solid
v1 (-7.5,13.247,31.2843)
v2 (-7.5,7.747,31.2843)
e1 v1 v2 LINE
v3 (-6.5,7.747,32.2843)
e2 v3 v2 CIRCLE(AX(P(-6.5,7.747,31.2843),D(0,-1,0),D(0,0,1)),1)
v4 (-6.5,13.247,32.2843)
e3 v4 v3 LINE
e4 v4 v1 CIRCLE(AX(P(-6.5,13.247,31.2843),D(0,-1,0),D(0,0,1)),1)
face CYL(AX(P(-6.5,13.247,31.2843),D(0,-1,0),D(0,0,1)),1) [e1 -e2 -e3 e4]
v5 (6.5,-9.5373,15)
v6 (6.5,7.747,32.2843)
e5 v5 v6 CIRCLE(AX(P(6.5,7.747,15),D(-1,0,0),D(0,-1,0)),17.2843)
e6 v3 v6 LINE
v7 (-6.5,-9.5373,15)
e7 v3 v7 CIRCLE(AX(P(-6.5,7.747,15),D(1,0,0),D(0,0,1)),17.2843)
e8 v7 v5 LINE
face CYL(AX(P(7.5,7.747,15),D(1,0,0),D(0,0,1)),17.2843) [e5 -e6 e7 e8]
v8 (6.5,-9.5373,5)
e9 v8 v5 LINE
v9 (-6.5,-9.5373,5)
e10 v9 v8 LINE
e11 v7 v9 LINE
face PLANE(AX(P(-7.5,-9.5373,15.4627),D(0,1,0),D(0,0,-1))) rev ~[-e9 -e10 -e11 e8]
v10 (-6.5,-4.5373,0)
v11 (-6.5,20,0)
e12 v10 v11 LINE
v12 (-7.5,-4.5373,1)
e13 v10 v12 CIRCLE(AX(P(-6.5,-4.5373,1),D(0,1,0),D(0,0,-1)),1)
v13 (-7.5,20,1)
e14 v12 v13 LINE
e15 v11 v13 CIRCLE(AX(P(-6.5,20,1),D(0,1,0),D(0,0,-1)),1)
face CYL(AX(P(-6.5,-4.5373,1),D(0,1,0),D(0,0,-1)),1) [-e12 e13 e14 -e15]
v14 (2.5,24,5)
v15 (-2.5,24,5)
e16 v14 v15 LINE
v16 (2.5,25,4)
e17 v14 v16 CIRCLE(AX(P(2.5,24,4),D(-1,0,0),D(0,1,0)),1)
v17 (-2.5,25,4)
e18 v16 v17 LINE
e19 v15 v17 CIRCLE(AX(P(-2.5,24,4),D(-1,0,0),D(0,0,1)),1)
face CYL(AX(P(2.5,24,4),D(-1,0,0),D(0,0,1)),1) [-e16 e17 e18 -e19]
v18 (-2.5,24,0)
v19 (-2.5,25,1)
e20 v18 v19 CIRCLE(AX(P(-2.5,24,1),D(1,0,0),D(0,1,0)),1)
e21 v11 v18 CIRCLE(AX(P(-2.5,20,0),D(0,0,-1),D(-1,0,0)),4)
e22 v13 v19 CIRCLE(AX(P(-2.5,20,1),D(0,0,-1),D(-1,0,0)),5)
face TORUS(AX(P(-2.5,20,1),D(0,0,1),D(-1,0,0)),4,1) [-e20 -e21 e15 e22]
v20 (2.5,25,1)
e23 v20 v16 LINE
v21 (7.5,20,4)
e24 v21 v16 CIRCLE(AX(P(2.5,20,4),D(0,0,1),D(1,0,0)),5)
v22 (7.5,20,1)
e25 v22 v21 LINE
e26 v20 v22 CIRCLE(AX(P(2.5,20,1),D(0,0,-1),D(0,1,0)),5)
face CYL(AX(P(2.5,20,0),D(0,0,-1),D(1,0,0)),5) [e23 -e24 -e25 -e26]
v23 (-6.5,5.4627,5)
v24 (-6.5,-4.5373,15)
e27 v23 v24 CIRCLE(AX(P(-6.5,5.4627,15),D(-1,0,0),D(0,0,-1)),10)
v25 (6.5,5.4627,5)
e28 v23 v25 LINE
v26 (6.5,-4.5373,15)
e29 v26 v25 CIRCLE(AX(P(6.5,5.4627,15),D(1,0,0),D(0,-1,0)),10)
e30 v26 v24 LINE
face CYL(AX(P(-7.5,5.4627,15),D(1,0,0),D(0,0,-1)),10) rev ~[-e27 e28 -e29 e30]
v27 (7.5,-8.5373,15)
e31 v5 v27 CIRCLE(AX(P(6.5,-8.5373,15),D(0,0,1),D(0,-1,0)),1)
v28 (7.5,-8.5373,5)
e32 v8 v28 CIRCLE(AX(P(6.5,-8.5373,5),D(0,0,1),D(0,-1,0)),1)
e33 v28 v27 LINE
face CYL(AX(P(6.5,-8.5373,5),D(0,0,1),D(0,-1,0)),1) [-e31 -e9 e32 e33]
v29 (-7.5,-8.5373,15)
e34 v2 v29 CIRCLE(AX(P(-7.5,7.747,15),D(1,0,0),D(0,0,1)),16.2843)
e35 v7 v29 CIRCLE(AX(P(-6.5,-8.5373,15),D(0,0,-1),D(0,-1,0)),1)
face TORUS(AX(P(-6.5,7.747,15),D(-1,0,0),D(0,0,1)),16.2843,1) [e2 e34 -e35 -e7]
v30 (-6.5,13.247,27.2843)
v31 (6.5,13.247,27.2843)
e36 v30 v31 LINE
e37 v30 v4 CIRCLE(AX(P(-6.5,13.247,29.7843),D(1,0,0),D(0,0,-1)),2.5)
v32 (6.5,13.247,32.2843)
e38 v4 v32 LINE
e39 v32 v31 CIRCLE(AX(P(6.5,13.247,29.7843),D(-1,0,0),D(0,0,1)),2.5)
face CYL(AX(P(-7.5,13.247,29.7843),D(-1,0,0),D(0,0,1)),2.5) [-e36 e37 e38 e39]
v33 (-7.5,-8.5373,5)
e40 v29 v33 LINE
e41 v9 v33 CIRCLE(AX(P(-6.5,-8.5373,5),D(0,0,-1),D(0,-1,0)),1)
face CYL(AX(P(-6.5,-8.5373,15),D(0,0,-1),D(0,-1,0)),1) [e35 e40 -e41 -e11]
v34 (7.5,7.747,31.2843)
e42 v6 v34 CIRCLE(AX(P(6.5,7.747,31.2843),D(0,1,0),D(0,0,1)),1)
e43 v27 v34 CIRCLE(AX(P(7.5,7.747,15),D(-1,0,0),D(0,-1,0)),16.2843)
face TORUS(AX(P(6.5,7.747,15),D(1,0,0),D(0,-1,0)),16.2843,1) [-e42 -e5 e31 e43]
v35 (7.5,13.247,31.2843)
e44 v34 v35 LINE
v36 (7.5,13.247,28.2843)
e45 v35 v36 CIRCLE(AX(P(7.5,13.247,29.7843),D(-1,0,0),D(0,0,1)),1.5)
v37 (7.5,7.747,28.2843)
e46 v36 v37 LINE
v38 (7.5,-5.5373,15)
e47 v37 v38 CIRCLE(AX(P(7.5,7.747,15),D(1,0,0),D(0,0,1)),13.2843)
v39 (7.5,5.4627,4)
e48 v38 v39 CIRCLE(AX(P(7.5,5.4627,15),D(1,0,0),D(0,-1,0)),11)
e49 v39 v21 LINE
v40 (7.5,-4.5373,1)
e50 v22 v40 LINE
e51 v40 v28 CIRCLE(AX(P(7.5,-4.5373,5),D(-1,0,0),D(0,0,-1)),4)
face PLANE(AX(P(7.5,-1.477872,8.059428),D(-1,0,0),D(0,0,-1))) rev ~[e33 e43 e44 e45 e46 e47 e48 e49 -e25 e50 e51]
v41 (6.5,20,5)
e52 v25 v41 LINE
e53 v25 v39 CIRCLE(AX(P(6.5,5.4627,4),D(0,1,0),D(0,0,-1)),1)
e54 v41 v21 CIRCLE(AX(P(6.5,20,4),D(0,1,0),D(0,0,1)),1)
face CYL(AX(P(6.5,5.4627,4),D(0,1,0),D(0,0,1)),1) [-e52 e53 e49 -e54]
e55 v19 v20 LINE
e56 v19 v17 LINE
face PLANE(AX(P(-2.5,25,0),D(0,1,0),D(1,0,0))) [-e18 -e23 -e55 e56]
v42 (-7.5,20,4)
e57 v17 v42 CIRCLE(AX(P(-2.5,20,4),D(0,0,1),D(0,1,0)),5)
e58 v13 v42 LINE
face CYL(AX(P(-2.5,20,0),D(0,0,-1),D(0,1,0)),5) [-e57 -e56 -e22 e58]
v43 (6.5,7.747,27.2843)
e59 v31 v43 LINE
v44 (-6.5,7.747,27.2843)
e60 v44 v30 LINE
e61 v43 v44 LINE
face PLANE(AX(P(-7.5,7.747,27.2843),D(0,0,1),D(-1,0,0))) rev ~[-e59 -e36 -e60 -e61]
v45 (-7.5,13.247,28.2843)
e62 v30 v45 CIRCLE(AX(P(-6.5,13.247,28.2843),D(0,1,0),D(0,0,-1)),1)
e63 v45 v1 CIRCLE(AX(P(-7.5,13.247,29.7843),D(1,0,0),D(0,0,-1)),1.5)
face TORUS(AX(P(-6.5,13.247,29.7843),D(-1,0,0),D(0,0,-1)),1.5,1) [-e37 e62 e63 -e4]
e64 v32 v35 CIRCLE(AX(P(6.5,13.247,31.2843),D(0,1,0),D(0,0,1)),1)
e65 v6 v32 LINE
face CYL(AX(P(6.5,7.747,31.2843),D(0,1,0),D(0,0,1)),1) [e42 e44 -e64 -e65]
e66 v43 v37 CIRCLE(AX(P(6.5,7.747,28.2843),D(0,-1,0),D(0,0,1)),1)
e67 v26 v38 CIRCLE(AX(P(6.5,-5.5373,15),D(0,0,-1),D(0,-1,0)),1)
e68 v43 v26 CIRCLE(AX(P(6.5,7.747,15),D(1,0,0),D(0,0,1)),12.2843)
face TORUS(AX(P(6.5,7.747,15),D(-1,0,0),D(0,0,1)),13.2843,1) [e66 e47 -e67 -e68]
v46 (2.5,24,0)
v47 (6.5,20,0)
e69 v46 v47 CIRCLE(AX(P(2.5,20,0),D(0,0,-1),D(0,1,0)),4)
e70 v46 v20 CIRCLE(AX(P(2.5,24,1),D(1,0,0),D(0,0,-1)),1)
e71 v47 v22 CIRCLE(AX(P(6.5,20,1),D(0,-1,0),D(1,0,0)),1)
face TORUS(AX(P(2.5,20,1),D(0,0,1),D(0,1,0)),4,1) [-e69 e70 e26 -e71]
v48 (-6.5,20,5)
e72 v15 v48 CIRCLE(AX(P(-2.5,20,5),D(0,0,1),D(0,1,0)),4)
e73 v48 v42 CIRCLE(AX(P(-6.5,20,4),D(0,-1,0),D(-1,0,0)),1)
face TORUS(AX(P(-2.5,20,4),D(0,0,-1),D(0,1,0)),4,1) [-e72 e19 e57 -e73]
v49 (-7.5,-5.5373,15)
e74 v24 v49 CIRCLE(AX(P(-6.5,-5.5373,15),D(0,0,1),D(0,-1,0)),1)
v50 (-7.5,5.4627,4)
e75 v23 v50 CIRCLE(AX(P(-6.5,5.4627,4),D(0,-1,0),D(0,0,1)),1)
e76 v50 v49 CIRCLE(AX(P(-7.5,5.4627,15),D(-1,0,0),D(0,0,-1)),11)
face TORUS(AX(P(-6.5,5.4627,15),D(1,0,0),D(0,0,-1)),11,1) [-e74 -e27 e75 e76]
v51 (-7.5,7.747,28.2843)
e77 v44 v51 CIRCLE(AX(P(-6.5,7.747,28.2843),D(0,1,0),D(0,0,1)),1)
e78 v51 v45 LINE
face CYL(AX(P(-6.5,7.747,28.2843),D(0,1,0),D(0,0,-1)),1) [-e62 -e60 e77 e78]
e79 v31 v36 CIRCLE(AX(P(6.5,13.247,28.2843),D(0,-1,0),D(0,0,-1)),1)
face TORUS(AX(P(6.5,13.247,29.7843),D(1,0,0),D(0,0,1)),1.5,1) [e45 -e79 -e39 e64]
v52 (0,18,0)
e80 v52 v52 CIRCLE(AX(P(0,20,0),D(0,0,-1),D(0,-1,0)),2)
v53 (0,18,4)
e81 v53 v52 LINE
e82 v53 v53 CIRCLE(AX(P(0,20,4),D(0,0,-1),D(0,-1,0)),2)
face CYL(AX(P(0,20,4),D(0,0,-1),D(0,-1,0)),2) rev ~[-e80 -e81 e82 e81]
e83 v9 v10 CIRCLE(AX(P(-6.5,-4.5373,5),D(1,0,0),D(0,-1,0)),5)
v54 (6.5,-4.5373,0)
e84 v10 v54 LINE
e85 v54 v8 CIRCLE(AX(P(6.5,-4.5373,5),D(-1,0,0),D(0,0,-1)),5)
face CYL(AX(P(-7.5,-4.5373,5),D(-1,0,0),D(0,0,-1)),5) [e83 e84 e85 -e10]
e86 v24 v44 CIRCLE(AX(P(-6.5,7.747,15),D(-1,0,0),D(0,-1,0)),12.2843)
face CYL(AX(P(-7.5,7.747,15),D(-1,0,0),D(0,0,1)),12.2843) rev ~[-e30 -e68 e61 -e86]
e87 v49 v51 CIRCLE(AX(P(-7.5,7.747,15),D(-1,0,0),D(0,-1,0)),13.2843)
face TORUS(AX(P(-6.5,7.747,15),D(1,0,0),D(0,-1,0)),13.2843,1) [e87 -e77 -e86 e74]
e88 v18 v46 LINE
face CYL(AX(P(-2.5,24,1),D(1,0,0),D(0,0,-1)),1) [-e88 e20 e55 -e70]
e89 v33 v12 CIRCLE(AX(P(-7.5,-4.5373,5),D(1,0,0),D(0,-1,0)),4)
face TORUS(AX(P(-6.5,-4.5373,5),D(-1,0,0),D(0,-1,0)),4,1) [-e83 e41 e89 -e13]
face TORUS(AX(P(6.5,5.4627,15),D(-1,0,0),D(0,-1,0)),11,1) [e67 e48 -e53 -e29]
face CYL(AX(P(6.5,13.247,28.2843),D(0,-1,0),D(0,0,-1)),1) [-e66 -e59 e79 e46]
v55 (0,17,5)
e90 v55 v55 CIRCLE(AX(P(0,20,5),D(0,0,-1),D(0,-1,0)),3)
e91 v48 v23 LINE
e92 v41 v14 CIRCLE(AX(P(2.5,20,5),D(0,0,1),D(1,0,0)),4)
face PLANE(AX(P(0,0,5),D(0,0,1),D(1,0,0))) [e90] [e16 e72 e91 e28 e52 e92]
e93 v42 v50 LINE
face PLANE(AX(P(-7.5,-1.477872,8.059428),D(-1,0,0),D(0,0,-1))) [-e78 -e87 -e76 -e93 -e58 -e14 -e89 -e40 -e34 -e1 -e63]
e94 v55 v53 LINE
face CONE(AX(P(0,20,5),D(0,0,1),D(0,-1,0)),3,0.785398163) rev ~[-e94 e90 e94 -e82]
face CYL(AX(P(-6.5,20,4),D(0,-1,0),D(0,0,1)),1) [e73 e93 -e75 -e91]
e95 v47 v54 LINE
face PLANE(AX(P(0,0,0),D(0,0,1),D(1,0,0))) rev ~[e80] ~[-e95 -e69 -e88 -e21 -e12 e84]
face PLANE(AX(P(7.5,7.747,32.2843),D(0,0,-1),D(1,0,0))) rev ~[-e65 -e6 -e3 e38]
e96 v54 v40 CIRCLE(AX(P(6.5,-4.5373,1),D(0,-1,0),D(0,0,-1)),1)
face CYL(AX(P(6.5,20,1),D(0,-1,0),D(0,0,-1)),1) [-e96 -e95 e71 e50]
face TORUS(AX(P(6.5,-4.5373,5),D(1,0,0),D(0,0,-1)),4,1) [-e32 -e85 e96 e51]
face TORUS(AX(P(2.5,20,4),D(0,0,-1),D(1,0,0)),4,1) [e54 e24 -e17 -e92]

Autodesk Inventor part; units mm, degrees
ref_plane "YZ Plane" through (0, 0, 0) normal (1, 0, 0) x (0, 1, 0)
ref_plane "XZ Plane" through (0, 0, 0) normal (0, 1, 0) x (-1, 0, 0)
ref_plane "XY Plane" through (0, 0, 0) normal (0, 0, 1) x (1, 0, 0)
sketch "Sketch1" plane through (0, 0, 0) normal (0, 0, 1) x (1, 0, 0)
  line L0 (-2.5, 25) -> (2.5, 25)
  line L1 (7.5, 20) -> (7.5, -20)
  line L2 (2.5, -25) -> (-2.5, -25)
  line L3 (-7.5, -20) -> (-7.5, 20)
  line L4 (-7.5, 25) -> (7.5, -25) construction
  line L5 (7.5, 25) -> (-7.5, -25) construction
  arc A0 (-2.5, 25) -> (-7.5, 20) centre (-2.5, 20) ccw
  arc A1 (7.5, 20) -> (2.5, 25) centre (2.5, 20) ccw
  arc A2 (2.5, -25) -> (7.5, -20) centre (2.5, -20) ccw
  arc A3 (-7.5, -20) -> (-2.5, -25) centre (-2.5, -20) ccw
  circle A4 centre (0, 20) radius 1
  point P0 (0, 0)
  dimension "d0" = 15
  dimension "d1" = 50
  dimension "d2" = 5
  dimension "d5" = 2
extrude "Extrusion2" add sketch "Sketch1" along normal blind 5
sketch "Sketch3" plane through (0, 0, 5) normal (0, 0, 1) x (1, 0, 0)
  circle A0 centre (0, 20) radius 1 projected
  point P0 (0, 0)
hole "Hole1" at (0, 20, 5) direction (0, 0, -1) diameter 4 end through all countersink diameter 6 countersink angle 90
sketch "Sketch4" plane through (0, 0, 0) normal (1, 0, 0) x (0, 1, 0)
  line L0 (28.9186, 2.2501) -> (-11.8341, 2.2501) construction
  line L1 (20, 0) -> (-20, 0) projected
  line L2 (-20, 5) -> (20, 5) construction
  line L3 (-2.191, 5) -> (-11.8341, 5) construction
  line L4 (-7.253, 15) -> (-7.253, 5)
  arc A0 (7.747, 30) -> (-7.253, 15) centre (7.747, 15) ccw
  line L5 (7.747, 30) -> (15.747, 30)
  point P0 (0, 0)
  point P1 (8.5422, 2.2501)
  dimension "d24" = 10
  dimension "d25" = 8
sketch "Sketch5" plane through (0, 0, 5) normal (0, 0, 1) x (1, 0, 0)
  line L0 (7.5, 20) -> (7.5, -20) projected
  line L1 (-7.5, -4.5373) -> (7.5, -4.5373)
  line L2 (7.5, -4.5373) -> (7.5, -9.5373)
  line L3 (7.5, -9.5373) -> (-7.5, -9.5373)
  line L4 (-7.5, -9.5373) -> (-7.5, -4.5373)
  line L5 (-7.5, -4.5373) -> (7.5, -9.5373) construction
  line L6 (7.5, -4.5373) -> (-7.5, -9.5373) construction
  point P0 (0, 0)
  point P1 (0, -7.0373)
  dimension "d17" = 15
  dimension "d18" = 5
sweep "Sweep3" add profiles "Sketch5" path "Sketch4" path curves L4 A0 L5
sketch "Sketch8" plane through (0, 0, 5) normal (0, 0, 1) x (1, 0, 0)
  line L0 (7.5, -9.5373) -> (-7.5, -9.5373) projected
  line L1 (-7.5, -4.5373) -> (7.5, -4.5373) projected
  point P0 (0, 0)
sketch "Sketch9" plane through (7.5, -20, 0) normal (1, 0, 0) x (0, 0, -1)
  line L0 (-5, 10.4627) -> (-15.4627, 10.4627)
  line L1 (-5, 10.4627) -> (-15.4627, 10.4627)
  line L2 (-5, 10.4627) -> (-15.4627, 10.4627)
  line L3 (-5, 10.4627) -> (-5, 0) projected
  line L4 (-5, 10.4627) -> (-5, 0)
  arc A0 (-5, 0) -> (-15.4627, 10.4627) centre (-15.4627, 0) ccw
  point P0 (0, 20)
  dimension "d31" = 10.4627
  dimension "d32" = 10.4627
sweep "Sweep4" add profiles "Sketch9" path "Sketch8" path curves L0
sketch "Sketch10" plane through (-7.5, -20, 0) normal (-1, 0, 0) x (0, 0, 1)
  line L0 (27.2843, 27.747) -> (27.2843, 35.747)
  line L1 (32.2843, 27.747) -> (32.2843, 35.747)
  line L2 (27.2843, 35.747) -> (32.2843, 35.747)
  arc A0 (32.2843, 33.247) -> (27.2843, 33.247) centre (29.7843, 33.247) ccw
  line L3 (27.2843, 33.247) -> (27.2843, 35.747)
  line L4 (32.2843, 35.747) -> (32.2843, 33.247)
  line L5 (27.2843, 35.747) -> (32.2843, 35.747)
  point P0 (0, 20)
  point P1 (29.7843, 35.747)
extrude "Extrusion3" cut sketch "Sketch10" against normal through all
sketch "Sketch11" plane through (-7.5, -4.5373, 5) normal (0, 1, 0) x (1, 0, 0)
  line L0 (0, 0) -> (15, 0) projected
  point P0 (7.5, 5)
sketch "Sketch12" plane through (-7.5, -20, 0) normal (-1, 0, 0) x (0, 0, 1)
  line L0 (5, 40) -> (5, 15.4627) projected
  line L1 (5, 15.4627) -> (15, 15.4627) projected
  line L2 (5, 15.4627) -> (15, 15.4627)
  line L3 (5, 15.4627) -> (5, 25.4627)
  line L4 (5, 15.4627) -> (5, 40) projected
  arc A0 (5, 25.4627) -> (15, 15.4627) centre (15, 25.4627) ccw
  point P0 (0, 20)
  dimension "d37" = 10
sweep "Sweep5" add profiles "Sketch12" path "Sketch11"
sketch "Sketch15" plane through (-7.5, -20, 0) normal (-1, 0, 0) x (0, 0, 1)
  arc A0 (5, 25.4627) -> (15, 15.4627) centre (15, 25.4627) ccw projected
  arc A1 (15, 15.4627) -> (27.2843, 27.747) centre (15, 27.747) ccw projected
  line L0 (15.4627, 10.4627) -> (5, 10.4627)
  arc A2 (0, 15.4627) -> (5, 10.4627) centre (5, 15.4627) ccw
  line L1 (0, 0) -> (0, -5) projected
  line L2 (0, -5) -> (5, -5) projected
  line L3 (5, -5) -> (5, 0) projected
  arc A3 (15.4627, 10.4627) -> (5, 0) centre (15.4627, 0) ccw projected
  line L4 (0, 0) -> (5, 0) projected
  line L5 (0, 0) -> (0, 15.4627)
  point P0 (0, 20)
  dimension "d43" = 5
extrude "Extrusion5" cut sketch "Sketch15" against normal through all
fillet "Fillet1" radius 1 33 edges at (7.5, -0.9393, 23.6863) (7.5, 10.497, 27.2843) (7.5, 15.747, 29.7843) (-7.5, 10.497, 32.2843) (-7.5, -4.4748, 27.2219) (-7.5, -9.5373, 10) (7.5, 10.497, 32.2843) (7.5, -4.4748, 27.2219) (7.5, -9.5373, 10) (0, 13.247, 32.2843) (0, 7.747, 32.2843) (0, -9.5373, 15) (0, -9.5373, 5) (7.5, -8.0728, 1.4645) (7.5, 7.7314, 0) (6.0355, 23.5355, 0) (0, 25, 0) (-6.0355, 23.5355, 0) (-7.5, 7.7314, 0) (-7.5, -8.0728, 1.4645) (-7.5, 15.747, 29.7843) (0, -4.5373, 15) (0, 7.747, 27.2843) (-7.5, -0.9393, 23.6863) (-7.5, 10.497, 27.2843) (0, 13.247, 27.2843) (-7.5, -1.6084, 7.9289) (-7.5, 12.7314, 5) (-6.0355, 23.5355, 5) (0, 25, 5) (6.0355, 23.5355, 5) (7.5, 12.7314, 5) (7.5, -1.6084, 7.9289)
sketch "Sketch13" plane through (7.5, -20, 0) normal (1, 0, 0) x (0, 0, -1)
  arc A0 (-5, 0) -> (-15.4627, 10.4627) centre (-15.4627, 0) ccw projected
  line L0 (0, 0) -> (0, 9.0751)
  line L1 (0, 0) -> (0, 40) projected
  line L2 (0, -5) -> (0, 0) projected
  arc A1 (-5, 0) -> (0, 0) centre (-2.5, 0) ccw
  line L3 (0, -5) -> (-5, -5) projected
  line L4 (0, -5) -> (-5, -5)
  line L5 (-5, 0) -> (-5, -5) projected
  line L6 (-5, -5) -> (-5, 0)
  point P0 (0, 20)
equation "\"d31\" = d32"
properties part number "single_hook"
